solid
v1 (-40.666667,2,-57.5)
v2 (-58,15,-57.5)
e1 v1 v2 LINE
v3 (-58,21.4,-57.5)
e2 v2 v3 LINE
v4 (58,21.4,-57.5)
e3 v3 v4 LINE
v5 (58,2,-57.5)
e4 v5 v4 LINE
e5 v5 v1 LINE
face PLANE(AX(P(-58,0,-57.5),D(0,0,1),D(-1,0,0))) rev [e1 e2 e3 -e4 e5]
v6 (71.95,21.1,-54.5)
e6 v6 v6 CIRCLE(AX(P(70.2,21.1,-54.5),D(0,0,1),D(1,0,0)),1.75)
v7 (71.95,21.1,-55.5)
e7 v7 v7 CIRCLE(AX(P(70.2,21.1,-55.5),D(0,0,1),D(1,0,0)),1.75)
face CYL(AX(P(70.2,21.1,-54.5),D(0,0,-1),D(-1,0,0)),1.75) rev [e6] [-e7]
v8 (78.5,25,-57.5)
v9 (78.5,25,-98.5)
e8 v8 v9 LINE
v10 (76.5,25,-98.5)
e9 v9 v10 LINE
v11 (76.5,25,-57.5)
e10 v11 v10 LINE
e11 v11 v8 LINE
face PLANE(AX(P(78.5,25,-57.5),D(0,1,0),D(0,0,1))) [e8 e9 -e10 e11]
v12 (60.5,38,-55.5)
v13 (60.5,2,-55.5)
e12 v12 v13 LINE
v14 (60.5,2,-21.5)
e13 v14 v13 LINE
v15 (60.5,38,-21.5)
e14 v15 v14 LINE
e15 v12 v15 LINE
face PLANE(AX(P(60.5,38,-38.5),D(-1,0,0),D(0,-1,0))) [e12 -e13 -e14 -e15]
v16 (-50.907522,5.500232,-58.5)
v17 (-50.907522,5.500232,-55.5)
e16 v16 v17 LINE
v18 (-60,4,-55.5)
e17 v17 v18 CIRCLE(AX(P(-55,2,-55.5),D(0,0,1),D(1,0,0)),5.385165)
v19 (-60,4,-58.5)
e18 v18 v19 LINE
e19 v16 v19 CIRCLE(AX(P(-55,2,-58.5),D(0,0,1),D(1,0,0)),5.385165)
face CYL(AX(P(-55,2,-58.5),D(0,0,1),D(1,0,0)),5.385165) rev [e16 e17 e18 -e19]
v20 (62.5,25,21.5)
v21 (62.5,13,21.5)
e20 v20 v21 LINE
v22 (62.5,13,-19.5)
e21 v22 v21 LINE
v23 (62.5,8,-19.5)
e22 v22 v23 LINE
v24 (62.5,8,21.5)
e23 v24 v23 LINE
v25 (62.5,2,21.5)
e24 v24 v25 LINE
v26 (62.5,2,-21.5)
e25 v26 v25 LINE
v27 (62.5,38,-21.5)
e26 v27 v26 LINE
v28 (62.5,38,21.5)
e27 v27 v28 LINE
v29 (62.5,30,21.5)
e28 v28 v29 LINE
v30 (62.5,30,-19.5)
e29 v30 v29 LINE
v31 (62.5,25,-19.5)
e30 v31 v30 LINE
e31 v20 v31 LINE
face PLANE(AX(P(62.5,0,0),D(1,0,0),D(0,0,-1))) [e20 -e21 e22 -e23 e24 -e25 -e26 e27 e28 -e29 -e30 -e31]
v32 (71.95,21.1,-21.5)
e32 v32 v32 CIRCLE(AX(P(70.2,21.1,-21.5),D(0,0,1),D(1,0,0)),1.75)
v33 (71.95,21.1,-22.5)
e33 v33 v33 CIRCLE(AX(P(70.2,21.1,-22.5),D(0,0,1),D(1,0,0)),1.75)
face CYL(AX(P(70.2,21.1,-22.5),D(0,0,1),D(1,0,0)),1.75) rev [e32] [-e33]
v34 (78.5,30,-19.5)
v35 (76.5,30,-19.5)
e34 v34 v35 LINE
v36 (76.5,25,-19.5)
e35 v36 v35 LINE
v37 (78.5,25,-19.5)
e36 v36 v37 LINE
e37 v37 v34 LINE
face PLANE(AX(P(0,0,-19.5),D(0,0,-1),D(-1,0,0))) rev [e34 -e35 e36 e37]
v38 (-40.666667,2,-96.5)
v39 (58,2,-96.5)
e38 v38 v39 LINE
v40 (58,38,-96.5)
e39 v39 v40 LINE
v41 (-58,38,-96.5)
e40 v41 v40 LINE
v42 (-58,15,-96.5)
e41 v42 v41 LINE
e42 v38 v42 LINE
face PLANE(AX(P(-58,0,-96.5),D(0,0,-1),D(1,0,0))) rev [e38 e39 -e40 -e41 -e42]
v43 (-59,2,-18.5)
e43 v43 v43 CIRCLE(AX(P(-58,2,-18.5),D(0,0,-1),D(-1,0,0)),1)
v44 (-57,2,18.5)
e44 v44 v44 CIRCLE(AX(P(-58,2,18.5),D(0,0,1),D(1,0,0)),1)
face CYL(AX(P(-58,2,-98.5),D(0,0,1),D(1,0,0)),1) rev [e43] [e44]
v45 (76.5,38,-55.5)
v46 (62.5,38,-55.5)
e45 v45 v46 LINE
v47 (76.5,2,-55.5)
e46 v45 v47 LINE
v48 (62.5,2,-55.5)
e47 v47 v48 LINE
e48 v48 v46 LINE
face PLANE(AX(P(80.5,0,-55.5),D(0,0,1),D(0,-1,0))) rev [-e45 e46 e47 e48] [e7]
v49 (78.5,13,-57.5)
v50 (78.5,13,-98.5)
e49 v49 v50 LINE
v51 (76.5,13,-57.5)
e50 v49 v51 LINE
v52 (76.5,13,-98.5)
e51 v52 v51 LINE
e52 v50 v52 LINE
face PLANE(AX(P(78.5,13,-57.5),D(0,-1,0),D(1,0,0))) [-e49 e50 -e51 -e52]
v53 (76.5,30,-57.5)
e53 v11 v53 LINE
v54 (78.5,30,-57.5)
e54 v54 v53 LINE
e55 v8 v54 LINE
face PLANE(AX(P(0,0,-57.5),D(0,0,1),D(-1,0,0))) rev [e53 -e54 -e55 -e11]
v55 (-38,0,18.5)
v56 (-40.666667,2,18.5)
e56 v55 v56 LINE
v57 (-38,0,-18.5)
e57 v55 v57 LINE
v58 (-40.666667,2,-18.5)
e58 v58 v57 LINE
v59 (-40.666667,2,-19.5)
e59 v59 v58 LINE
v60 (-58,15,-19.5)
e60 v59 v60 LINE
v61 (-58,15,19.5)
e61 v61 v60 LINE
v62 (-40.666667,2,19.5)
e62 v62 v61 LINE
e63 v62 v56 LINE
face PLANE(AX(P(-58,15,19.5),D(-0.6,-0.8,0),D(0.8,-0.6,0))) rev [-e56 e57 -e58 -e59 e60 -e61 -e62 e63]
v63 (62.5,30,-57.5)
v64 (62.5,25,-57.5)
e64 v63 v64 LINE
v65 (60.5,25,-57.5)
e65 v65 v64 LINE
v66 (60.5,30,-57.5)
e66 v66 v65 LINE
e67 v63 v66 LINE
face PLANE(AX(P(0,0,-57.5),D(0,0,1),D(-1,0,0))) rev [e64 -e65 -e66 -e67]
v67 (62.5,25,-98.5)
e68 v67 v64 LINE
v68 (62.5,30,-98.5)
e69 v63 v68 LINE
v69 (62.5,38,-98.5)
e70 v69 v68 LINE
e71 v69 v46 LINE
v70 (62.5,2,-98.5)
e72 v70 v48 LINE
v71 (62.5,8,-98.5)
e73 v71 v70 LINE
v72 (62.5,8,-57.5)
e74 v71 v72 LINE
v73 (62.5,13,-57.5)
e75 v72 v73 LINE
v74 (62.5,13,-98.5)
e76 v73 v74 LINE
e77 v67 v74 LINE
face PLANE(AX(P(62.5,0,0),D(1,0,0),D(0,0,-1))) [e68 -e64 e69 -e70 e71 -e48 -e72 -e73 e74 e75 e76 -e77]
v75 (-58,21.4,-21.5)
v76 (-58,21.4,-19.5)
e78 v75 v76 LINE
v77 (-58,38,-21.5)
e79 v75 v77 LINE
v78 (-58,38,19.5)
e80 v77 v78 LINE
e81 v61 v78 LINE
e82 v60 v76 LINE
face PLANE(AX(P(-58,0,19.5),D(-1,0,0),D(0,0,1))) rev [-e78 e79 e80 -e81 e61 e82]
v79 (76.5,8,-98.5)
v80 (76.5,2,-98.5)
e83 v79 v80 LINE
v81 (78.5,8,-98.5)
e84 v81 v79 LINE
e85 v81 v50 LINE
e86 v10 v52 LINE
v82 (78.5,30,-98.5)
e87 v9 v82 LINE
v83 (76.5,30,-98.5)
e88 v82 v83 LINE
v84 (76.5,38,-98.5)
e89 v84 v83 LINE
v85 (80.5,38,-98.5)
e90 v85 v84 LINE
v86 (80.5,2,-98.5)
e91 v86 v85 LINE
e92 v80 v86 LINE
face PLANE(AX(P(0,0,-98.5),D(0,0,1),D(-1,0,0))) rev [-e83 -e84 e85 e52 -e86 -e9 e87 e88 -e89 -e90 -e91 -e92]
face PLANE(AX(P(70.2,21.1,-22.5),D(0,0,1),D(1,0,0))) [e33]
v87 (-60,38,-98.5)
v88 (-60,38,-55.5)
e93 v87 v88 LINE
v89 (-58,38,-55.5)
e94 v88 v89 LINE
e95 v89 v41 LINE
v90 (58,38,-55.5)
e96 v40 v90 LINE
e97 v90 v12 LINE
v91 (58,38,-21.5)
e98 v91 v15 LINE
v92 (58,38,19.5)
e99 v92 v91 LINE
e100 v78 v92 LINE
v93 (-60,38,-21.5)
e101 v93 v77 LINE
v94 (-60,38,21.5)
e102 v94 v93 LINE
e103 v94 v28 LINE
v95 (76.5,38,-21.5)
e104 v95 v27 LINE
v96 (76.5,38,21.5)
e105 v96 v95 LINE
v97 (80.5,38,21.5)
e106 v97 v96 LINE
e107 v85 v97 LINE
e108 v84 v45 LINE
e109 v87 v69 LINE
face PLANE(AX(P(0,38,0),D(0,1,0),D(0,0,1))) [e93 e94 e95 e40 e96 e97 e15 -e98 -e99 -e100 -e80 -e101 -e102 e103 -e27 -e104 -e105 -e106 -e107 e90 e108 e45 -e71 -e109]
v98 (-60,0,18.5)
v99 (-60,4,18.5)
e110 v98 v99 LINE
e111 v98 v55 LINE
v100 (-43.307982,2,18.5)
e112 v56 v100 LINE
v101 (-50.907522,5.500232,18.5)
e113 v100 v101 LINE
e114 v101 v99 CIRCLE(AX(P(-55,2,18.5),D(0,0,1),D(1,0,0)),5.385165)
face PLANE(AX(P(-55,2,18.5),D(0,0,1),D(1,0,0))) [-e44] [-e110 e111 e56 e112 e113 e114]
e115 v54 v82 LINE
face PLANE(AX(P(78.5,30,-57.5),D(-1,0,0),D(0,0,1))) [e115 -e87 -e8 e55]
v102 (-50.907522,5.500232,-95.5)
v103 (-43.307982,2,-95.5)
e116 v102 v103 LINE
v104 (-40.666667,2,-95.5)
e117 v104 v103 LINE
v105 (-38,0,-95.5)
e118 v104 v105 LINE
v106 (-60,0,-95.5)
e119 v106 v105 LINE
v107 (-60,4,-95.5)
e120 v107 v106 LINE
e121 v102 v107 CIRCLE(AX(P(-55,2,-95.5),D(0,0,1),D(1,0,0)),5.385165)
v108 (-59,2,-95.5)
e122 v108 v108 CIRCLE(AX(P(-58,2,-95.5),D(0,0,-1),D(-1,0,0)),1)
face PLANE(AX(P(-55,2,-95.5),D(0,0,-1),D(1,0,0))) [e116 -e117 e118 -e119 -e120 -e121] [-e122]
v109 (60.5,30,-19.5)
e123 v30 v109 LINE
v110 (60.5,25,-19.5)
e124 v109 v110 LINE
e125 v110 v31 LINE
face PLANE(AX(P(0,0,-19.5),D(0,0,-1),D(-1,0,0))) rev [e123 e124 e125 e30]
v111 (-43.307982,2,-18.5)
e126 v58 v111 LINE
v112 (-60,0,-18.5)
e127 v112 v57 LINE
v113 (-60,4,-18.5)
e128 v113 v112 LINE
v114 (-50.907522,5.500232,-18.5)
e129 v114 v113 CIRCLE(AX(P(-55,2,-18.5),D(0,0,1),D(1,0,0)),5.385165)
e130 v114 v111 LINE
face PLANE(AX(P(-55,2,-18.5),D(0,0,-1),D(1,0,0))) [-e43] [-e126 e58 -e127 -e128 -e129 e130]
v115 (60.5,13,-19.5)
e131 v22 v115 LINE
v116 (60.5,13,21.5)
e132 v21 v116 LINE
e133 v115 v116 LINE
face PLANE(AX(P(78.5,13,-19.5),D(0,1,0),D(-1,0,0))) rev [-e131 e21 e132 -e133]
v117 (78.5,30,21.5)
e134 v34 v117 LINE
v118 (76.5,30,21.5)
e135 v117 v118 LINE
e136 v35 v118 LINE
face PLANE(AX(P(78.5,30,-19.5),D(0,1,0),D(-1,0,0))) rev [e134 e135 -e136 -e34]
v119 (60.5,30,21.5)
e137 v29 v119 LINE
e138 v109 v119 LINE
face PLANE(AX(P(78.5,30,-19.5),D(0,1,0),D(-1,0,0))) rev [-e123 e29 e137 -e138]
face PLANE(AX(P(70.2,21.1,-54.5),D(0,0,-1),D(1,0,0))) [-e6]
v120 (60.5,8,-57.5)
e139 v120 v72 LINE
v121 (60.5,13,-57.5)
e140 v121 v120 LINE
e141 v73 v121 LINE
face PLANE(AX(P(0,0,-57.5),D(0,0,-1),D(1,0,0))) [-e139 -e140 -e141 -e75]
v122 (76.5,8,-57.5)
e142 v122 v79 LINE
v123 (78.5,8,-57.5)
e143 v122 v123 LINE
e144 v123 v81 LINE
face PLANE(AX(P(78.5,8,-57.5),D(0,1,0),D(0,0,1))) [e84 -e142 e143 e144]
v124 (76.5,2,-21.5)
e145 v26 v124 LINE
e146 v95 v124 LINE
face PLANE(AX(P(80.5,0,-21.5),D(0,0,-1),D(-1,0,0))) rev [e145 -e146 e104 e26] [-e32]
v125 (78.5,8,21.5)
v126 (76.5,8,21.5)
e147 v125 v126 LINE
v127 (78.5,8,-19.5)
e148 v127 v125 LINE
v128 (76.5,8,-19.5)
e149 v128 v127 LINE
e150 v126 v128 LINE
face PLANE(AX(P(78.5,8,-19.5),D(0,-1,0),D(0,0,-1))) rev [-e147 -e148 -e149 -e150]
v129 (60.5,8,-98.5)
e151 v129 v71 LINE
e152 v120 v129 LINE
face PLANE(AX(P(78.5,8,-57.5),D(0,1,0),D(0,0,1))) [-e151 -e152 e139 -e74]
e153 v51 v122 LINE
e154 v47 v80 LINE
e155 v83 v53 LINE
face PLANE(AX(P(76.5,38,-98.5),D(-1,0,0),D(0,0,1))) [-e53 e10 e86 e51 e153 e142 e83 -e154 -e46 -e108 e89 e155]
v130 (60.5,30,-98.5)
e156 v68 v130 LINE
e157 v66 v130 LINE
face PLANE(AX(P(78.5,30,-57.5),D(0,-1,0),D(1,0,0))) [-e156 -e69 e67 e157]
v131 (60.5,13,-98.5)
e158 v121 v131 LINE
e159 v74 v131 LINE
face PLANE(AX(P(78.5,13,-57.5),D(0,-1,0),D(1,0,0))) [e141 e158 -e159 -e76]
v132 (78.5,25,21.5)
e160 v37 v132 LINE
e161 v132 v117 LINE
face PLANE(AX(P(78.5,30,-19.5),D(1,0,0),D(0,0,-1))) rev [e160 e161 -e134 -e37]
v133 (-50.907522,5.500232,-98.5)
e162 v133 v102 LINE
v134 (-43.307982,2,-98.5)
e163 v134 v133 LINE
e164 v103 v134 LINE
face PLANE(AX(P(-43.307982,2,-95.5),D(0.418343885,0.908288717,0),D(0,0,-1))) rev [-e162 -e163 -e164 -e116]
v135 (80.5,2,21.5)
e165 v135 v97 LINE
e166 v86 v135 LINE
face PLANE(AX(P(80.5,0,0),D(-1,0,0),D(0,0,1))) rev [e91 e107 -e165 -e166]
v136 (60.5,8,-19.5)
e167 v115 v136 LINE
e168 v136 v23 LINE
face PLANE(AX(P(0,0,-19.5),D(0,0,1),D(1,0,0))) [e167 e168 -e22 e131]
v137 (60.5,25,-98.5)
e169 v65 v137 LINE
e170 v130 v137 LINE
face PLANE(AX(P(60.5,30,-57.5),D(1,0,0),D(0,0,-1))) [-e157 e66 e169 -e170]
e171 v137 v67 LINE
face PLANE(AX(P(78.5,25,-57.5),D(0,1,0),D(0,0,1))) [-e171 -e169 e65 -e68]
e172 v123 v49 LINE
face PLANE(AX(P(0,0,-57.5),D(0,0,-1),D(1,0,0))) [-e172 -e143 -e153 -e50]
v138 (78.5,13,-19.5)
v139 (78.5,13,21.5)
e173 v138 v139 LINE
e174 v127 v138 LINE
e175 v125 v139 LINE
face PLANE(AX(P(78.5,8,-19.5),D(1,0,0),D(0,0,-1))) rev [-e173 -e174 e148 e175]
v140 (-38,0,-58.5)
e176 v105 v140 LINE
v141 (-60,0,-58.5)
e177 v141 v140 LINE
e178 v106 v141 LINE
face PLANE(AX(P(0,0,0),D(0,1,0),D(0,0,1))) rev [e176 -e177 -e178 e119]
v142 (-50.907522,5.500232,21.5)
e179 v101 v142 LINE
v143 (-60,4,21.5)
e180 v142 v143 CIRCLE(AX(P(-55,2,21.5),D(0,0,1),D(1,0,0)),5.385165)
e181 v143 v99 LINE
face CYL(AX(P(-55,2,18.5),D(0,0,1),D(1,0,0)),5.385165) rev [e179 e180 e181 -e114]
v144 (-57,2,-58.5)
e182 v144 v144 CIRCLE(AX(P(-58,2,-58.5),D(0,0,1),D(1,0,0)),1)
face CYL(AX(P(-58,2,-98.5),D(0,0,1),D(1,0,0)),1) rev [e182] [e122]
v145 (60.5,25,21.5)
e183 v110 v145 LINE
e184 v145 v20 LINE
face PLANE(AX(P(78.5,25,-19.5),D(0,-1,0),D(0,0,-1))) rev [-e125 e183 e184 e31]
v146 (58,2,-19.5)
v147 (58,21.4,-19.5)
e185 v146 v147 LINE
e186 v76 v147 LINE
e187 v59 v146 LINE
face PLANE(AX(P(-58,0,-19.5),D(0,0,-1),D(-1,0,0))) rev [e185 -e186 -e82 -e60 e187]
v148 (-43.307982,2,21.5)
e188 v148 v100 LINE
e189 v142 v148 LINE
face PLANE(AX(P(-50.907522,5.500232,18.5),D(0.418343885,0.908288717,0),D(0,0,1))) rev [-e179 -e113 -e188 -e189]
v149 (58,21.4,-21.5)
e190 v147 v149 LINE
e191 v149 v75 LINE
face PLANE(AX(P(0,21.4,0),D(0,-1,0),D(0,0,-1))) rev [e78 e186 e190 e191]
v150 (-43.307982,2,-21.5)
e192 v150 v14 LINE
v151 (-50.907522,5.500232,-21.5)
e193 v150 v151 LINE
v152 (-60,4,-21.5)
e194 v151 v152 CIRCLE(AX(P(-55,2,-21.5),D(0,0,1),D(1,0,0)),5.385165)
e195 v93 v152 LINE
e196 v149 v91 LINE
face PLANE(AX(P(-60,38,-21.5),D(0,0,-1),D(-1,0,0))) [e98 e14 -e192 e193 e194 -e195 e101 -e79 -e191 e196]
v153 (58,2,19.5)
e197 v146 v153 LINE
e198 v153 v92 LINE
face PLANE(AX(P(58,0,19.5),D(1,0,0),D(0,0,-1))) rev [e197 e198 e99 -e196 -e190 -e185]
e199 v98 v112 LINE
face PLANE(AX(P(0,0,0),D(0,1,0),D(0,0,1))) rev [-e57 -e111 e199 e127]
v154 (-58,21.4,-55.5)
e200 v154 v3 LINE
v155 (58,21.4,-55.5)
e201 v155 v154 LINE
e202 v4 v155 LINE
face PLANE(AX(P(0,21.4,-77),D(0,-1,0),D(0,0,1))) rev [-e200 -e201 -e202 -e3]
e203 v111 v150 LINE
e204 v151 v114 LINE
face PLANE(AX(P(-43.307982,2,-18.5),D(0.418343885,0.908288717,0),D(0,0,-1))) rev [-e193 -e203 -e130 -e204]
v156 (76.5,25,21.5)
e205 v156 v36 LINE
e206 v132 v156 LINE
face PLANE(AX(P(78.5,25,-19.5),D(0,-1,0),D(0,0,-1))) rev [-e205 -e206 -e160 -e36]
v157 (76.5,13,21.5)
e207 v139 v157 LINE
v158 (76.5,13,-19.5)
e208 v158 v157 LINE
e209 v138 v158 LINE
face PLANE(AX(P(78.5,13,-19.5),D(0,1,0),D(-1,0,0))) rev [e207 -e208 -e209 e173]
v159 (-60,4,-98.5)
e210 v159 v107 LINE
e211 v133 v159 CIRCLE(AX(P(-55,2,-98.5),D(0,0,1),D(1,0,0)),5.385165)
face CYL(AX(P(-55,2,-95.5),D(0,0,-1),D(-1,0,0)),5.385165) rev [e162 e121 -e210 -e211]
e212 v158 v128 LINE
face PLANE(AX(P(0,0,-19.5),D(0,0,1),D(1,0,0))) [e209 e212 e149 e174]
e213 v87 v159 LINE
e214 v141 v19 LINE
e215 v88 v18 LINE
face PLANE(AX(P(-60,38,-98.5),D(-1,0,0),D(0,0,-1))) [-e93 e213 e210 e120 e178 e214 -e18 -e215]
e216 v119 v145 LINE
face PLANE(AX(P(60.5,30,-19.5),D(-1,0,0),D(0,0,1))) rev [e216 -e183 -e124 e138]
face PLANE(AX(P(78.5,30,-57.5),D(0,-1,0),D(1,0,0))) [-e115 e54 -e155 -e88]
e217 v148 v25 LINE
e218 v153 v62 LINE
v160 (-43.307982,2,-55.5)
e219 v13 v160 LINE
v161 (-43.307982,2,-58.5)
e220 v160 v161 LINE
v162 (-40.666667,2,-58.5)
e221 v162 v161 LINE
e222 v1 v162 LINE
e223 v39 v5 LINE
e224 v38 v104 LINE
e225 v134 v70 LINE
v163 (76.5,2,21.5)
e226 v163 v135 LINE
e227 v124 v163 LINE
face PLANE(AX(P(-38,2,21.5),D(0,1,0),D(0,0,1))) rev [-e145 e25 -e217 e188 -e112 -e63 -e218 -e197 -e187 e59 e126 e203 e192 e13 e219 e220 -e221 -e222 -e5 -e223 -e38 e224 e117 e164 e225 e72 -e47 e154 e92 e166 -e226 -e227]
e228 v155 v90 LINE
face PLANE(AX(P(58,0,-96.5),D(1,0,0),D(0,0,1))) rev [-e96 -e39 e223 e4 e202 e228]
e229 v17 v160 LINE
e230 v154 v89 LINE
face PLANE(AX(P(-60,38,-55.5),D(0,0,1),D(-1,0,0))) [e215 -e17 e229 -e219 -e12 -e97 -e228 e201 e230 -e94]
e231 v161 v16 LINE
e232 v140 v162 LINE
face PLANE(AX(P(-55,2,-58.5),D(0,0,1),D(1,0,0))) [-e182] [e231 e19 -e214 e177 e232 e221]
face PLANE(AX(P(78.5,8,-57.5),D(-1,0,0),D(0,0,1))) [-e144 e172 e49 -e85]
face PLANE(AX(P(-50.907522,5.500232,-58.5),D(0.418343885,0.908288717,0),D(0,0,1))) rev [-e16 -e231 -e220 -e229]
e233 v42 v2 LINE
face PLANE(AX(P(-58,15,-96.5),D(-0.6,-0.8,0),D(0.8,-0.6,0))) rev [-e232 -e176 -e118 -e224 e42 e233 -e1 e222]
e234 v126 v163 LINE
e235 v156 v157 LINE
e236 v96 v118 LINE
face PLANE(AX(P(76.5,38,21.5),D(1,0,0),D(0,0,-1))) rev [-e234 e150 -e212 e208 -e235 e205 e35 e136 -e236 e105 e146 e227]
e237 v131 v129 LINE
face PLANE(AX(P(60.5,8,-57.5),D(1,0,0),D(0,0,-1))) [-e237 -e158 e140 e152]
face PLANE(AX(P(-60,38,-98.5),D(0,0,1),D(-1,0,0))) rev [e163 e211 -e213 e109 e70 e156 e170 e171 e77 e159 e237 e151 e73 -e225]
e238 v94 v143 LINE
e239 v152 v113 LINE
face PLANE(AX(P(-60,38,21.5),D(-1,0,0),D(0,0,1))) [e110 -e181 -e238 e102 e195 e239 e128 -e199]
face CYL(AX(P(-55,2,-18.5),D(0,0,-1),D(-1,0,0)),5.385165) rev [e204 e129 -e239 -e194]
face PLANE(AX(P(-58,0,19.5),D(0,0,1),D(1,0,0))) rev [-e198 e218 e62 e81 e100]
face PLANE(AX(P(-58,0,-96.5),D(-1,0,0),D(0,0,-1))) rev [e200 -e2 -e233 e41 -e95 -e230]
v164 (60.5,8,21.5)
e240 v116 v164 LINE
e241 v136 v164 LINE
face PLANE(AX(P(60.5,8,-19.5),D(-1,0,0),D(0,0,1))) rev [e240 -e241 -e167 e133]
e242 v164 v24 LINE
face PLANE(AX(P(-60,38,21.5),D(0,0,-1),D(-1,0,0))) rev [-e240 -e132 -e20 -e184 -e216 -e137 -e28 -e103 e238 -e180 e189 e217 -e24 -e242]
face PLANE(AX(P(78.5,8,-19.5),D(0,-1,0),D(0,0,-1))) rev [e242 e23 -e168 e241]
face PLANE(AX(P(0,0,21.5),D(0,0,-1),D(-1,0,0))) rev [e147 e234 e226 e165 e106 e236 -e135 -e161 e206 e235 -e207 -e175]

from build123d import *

# Parameters (mm, degrees)
SKETCH2_W            = 120
SKETCH2_H            = 43
BOSS_EXTRUDE1_DEPTH  = 38
SKETCH3_W            = 116
SKETCH3_H            = 39
CUT_EXTRUDE1_DEPTH   = 38
BOSS_EXTRUDE2_DEPTH  = 39
SKETCH5_W            = 43
SKETCH5_H            = 38
BOSS_EXTRUDE3_DEPTH  = 2.5
SKETCH6_W            = 2
SKETCH6_H            = 38
BOSS_EXTRUDE4_DEPTH  = 17
SKETCH7_W            = 34
SKETCH7_H            = 38
BOSS_EXTRUDE5_DEPTH  = 18
SKETCH8_W            = 4
SKETCH8_H            = 38
BOSS_EXTRUDE6_DEPTH  = 43
SKETCH9_W            = 18
SKETCH9_H            = 5
CUT_EXTRUDE2_DEPTH   = 41
SKETCH11_W           = 120
SKETCH11_H           = 2
CUT_EXTRUDE3_DEPTH   = 118.5
CUT_EXTRUDE4_DEPTH   = 3
MIRROR4_COPY_1_DEPTH = 3
CUT_EXTRUDE5_START   = -114
SKETCH13_R           = 1
CUT_EXTRUDE5_DEPTH   = 114
SKETCH14_W           = 116
SKETCH14_H           = 2
CUT_EXTRUDE6_DEPTH   = 16.6
SKETCH15_R           = 1.75
CUT_EXTRUDE7_DEPTH   = 1


with BuildPart() as part:
    # Sketch2 → Boss-Extrude1 (new body)
    with BuildSketch(Plane(origin=(0, 0, 0), x_dir=(1, 0, 0), z_dir=(0, 1, 0))):
        Rectangle(SKETCH2_W, SKETCH2_H)
    extrude(amount=BOSS_EXTRUDE1_DEPTH)

    # Sketch3 → Cut-Extrude1 (cut)
    with BuildSketch(Plane(origin=(0, 38, 0), x_dir=(1, 0, 0), z_dir=(0, 1, 0))):
        Rectangle(SKETCH3_W, SKETCH3_H)
    extrude(amount=-CUT_EXTRUDE1_DEPTH, mode=Mode.SUBTRACT)

    # Sketch4 → Boss-Extrude2 (add)
    with BuildSketch(Plane.XY.offset(-19.5)):
        Polygon((-58, 0), (-58, 15), (-38, 0), align=None)
    extrude(amount=BOSS_EXTRUDE2_DEPTH)

    # Sketch5 → Boss-Extrude3 (add)
    with BuildSketch(Plane(origin=(60, 0, 0), x_dir=(0, 0, -1), z_dir=(1, 0, 0))):
        with Locations((0, 19)):
            Rectangle(SKETCH5_W, SKETCH5_H)
    extrude(amount=BOSS_EXTRUDE3_DEPTH)

    # Sketch6 → Boss-Extrude4 (add)
    with BuildSketch(Plane(origin=(0, 0, -21.5), x_dir=(-1, 0, 0), z_dir=(0, 0, -1))):
        with Locations((-61.5, 19)):
            Rectangle(SKETCH6_W, SKETCH6_H)
    extrude(amount=BOSS_EXTRUDE4_DEPTH)

    # Mirror1: part across plane


with BuildPart() as part_1:
    add(part.part)
    add(part.part.mirror(Plane(origin=(0, 0, -38.5), x_dir=(1, 0, 0), z_dir=(0, 0, -1))))

    # Sketch7 → Boss-Extrude5 (add)
    with BuildSketch(Plane(origin=(62.5, 0, 0), x_dir=(0, 0, -1), z_dir=(1, 0, 0))):
        with Locations((38.5, 19)):
            Rectangle(SKETCH7_W, SKETCH7_H)
    extrude(amount=BOSS_EXTRUDE5_DEPTH)

    # Sketch8 → Boss-Extrude6 (add)
    with BuildSketch(Plane.XY.offset(-21.5)):
        with Locations((78.5, 19)):
            Rectangle(SKETCH8_W, SKETCH8_H)
    boss_extrude6 = extrude(amount=BOSS_EXTRUDE6_DEPTH)

    # Sketch9 → Cut-Extrude2 (cut)
    with BuildSketch(Plane.XY.offset(21.5)):
        with Locations((69.5, 27.5)):
            Rectangle(SKETCH9_W, SKETCH9_H)
        with Locations((69.5, 10.5)):
            Rectangle(SKETCH9_W, SKETCH9_H)
    cut_extrude2 = extrude(amount=-CUT_EXTRUDE2_DEPTH, mode=Mode.SUBTRACT)

    # Mirror2: Boss-Extrude6, Cut-Extrude2 across plane
    add(boss_extrude6.mirror(Plane(origin=(0, 0, -38.5), x_dir=(1, 0, 0), z_dir=(0, 0, -1))))
    add(cut_extrude2.mirror(Plane(origin=(0, 0, -38.5), x_dir=(1, 0, 0), z_dir=(0, 0, -1))), mode=Mode.SUBTRACT)

    # Sketch11 → Cut-Extrude3 (cut)
    with BuildSketch(Plane(origin=(80.5, 0, 0), x_dir=(0, 0, -1), z_dir=(1, 0, 0))):
        with Locations((38.5, 1)):
            Rectangle(SKETCH11_W, SKETCH11_H)
    extrude(amount=-CUT_EXTRUDE3_DEPTH, mode=Mode.SUBTRACT)

    # Sketch12 → Cut-Extrude4 (cut)
    with BuildSketch(Plane.XY.offset(21.5)):
        with BuildLine():
            Line((-38, 2), (-49.614835193, 2))
            ThreePointArc((-49.614835193, 2), (-56.018375168, 7.287996976), (-60, 0))
            Line((-60, 0), (-38, 0))
            Line((-38, 0), (-38, 2))
        make_face()
    cut_extrude4 = extrude(amount=-CUT_EXTRUDE4_DEPTH, mode=Mode.SUBTRACT)

    # Mirror3: Cut-Extrude4 across plane
    add(cut_extrude4.mirror(Plane.XY), mode=Mode.SUBTRACT)

    # Mirror4: Cut-Extrude4 across plane
    add(cut_extrude4.mirror(Plane(origin=(0, 0, -38.5), x_dir=(1, 0, 0), z_dir=(0, 0, -1))), mode=Mode.SUBTRACT)

    # Mirror4 copy 1 sketch → Mirror4 copy 1 (cut)
    with BuildSketch(Plane.XY.offset(-55.5)):
        with BuildLine():
            Line((-38, 2), (-49.614835193, 2))
            ThreePointArc((-49.614835193, 2), (-56.018375168, 7.287996976), (-60, 0))
            Line((-60, 0), (-38, 0))
            Line((-38, 0), (-38, 2))
        make_face()
    extrude(amount=-MIRROR4_COPY_1_DEPTH, mode=Mode.SUBTRACT)

    # Sketch13 → Cut-Extrude5 (cut)
    with BuildSketch(Plane.XY.offset(18.5).offset(CUT_EXTRUDE5_START)):
        with Locations((-58, 2)):
            Circle(SKETCH13_R)
    extrude(amount=CUT_EXTRUDE5_DEPTH, mode=Mode.SUBTRACT)

    # Chamfer1
    # the kernel refuses this chamfer: 10 mm, written as the material it takes off along each edge
    with BuildSketch(Plane(origin=(-49.614835193, 2, 38.180669666), x_dir=(-0.41152080336556635, 0.9114003666870882, 0), z_dir=(0, 0, -1))) as chamfer1_piece_1:
        with BuildLine():
            Line((4.024103798, 0), (-2.897424879, 6.010331734))
            Line((-2.897424879, 6.010331734), (-3.079704953, 5.928027573))
            ThreePointArc((-3.079704953, 5.928027573), (-1.554736759, 2.957293148), (-0.182280073, -0.082304161))
            Line((-0.182280073, -0.082304161), (0.082304161, -0.182280073))
            ThreePointArc((0.082304161, -0.182280073), (2.000716354, 0.27264804), (3.968173362, -0.192020276))
            Line((3.968173362, -0.192020276), (4.024103798, 0))
        make_face()
    extrude(amount=19.680669666, mode=Mode.SUBTRACT)

    # Chamfer2
    # the kernel refuses this chamfer: 10 mm, written as the material it takes off along each edge
    with BuildSketch(Plane(origin=(-49.614835193, 2, -38.180669666), x_dir=(0.9996854583228201, -0.0250795617564035, 0), z_dir=(0, 0, 1))) as chamfer2_piece_1:
        with BuildLine():
            Line((6.672267866, 0), (-1.747462586, 3.624884258))
            Line((-1.747462586, 3.624884258), (-1.896145364, 3.491117927))
            ThreePointArc((-1.896145364, 3.491117927), (-0.623209418, 1.920628258), (-0.199937092, -0.005015912))
            Line((-0.199937092, -0.005015912), (0.005015912, -0.199937092))
            ThreePointArc((0.005015912, -0.199937092), (3.339051469, -0.116294632), (6.677283779, -0.199937092))
            Line((6.677283779, -0.199937092), (6.672267866, 0))
        make_face()
    extrude(amount=19.680669666, mode=Mode.SUBTRACT)

    # Chamfer3
    # the kernel refuses this chamfer: 10 mm, written as the material it takes off along each edge
    with BuildSketch(Plane(origin=(-49.614835193, 2, -38.819330334), x_dir=(0.9996854583228201, -0.02507956175640344, 0), z_dir=(0, 0, -1))) as chamfer3_piece_1:
        with BuildLine():
            Line((6.672267866, 0), (-1.747462586, -3.624884258))
            Line((-1.747462586, -3.624884258), (-1.896145364, -3.491117927))
            ThreePointArc((-1.896145364, -3.491117927), (-0.623209418, -1.920628258), (-0.199937092, 0.005015912))
            Line((-0.199937092, 0.005015912), (0.005015912, 0.199937092))
            ThreePointArc((0.005015912, 0.199937092), (3.339051469, 0.116294632), (6.677283779, 0.199937092))
            Line((6.677283779, 0.199937092), (6.672267866, 0))
        make_face()
    extrude(amount=19.680669666, mode=Mode.SUBTRACT)

    # Chamfer4
    # the kernel refuses this chamfer: 10 mm, written as the material it takes off along each edge
    with BuildSketch(Plane(origin=(-49.614835193, 2, -115.180669666), x_dir=(0.9996854583228201, -0.0250795617564035, 0), z_dir=(0, 0, 1))) as chamfer4_piece_1:
        with BuildLine():
            Line((6.672267866, 0), (-1.747462586, 3.624884258))
            Line((-1.747462586, 3.624884258), (-1.896145364, 3.491117927))
            ThreePointArc((-1.896145364, 3.491117927), (-0.623209418, 1.920628258), (-0.199937092, -0.005015912))
            Line((-0.199937092, -0.005015912), (0.005015912, -0.199937092))
            ThreePointArc((0.005015912, -0.199937092), (3.339051469, -0.116294632), (6.677283779, -0.199937092))
            Line((6.677283779, -0.199937092), (6.672267866, 0))
        make_face()
    extrude(amount=19.680669666, mode=Mode.SUBTRACT)

    # Sketch14 → Cut-Extrude6 (cut)
    with BuildSketch(Plane(origin=(0, 38, 0), x_dir=(1, 0, 0), z_dir=(0, 1, 0))):
        with Locations((0, 20.5)):
            Rectangle(SKETCH14_W, SKETCH14_H)
    cut_extrude6 = extrude(amount=-CUT_EXTRUDE6_DEPTH, mode=Mode.SUBTRACT)

    # Mirror5: Cut-Extrude6 across plane
    add(cut_extrude6.mirror(Plane(origin=(0, 0, -38.5), x_dir=(1, 0, 0), z_dir=(0, 0, -1))), mode=Mode.SUBTRACT)

    # Sketch15 → Cut-Extrude7 (cut)
    with BuildSketch(Plane.XY.offset(-21.5)):
        with Locations((70.2, 21.1)):
            Circle(SKETCH15_R)
    cut_extrude7 = extrude(amount=-CUT_EXTRUDE7_DEPTH, mode=Mode.SUBTRACT)

    # Mirror6: Cut-Extrude7 across plane
    add(cut_extrude7.mirror(Plane(origin=(0, 0, -38.5), x_dir=(1, 0, 0), z_dir=(0, 0, -1))), mode=Mode.SUBTRACT)


solid = part_1.part
